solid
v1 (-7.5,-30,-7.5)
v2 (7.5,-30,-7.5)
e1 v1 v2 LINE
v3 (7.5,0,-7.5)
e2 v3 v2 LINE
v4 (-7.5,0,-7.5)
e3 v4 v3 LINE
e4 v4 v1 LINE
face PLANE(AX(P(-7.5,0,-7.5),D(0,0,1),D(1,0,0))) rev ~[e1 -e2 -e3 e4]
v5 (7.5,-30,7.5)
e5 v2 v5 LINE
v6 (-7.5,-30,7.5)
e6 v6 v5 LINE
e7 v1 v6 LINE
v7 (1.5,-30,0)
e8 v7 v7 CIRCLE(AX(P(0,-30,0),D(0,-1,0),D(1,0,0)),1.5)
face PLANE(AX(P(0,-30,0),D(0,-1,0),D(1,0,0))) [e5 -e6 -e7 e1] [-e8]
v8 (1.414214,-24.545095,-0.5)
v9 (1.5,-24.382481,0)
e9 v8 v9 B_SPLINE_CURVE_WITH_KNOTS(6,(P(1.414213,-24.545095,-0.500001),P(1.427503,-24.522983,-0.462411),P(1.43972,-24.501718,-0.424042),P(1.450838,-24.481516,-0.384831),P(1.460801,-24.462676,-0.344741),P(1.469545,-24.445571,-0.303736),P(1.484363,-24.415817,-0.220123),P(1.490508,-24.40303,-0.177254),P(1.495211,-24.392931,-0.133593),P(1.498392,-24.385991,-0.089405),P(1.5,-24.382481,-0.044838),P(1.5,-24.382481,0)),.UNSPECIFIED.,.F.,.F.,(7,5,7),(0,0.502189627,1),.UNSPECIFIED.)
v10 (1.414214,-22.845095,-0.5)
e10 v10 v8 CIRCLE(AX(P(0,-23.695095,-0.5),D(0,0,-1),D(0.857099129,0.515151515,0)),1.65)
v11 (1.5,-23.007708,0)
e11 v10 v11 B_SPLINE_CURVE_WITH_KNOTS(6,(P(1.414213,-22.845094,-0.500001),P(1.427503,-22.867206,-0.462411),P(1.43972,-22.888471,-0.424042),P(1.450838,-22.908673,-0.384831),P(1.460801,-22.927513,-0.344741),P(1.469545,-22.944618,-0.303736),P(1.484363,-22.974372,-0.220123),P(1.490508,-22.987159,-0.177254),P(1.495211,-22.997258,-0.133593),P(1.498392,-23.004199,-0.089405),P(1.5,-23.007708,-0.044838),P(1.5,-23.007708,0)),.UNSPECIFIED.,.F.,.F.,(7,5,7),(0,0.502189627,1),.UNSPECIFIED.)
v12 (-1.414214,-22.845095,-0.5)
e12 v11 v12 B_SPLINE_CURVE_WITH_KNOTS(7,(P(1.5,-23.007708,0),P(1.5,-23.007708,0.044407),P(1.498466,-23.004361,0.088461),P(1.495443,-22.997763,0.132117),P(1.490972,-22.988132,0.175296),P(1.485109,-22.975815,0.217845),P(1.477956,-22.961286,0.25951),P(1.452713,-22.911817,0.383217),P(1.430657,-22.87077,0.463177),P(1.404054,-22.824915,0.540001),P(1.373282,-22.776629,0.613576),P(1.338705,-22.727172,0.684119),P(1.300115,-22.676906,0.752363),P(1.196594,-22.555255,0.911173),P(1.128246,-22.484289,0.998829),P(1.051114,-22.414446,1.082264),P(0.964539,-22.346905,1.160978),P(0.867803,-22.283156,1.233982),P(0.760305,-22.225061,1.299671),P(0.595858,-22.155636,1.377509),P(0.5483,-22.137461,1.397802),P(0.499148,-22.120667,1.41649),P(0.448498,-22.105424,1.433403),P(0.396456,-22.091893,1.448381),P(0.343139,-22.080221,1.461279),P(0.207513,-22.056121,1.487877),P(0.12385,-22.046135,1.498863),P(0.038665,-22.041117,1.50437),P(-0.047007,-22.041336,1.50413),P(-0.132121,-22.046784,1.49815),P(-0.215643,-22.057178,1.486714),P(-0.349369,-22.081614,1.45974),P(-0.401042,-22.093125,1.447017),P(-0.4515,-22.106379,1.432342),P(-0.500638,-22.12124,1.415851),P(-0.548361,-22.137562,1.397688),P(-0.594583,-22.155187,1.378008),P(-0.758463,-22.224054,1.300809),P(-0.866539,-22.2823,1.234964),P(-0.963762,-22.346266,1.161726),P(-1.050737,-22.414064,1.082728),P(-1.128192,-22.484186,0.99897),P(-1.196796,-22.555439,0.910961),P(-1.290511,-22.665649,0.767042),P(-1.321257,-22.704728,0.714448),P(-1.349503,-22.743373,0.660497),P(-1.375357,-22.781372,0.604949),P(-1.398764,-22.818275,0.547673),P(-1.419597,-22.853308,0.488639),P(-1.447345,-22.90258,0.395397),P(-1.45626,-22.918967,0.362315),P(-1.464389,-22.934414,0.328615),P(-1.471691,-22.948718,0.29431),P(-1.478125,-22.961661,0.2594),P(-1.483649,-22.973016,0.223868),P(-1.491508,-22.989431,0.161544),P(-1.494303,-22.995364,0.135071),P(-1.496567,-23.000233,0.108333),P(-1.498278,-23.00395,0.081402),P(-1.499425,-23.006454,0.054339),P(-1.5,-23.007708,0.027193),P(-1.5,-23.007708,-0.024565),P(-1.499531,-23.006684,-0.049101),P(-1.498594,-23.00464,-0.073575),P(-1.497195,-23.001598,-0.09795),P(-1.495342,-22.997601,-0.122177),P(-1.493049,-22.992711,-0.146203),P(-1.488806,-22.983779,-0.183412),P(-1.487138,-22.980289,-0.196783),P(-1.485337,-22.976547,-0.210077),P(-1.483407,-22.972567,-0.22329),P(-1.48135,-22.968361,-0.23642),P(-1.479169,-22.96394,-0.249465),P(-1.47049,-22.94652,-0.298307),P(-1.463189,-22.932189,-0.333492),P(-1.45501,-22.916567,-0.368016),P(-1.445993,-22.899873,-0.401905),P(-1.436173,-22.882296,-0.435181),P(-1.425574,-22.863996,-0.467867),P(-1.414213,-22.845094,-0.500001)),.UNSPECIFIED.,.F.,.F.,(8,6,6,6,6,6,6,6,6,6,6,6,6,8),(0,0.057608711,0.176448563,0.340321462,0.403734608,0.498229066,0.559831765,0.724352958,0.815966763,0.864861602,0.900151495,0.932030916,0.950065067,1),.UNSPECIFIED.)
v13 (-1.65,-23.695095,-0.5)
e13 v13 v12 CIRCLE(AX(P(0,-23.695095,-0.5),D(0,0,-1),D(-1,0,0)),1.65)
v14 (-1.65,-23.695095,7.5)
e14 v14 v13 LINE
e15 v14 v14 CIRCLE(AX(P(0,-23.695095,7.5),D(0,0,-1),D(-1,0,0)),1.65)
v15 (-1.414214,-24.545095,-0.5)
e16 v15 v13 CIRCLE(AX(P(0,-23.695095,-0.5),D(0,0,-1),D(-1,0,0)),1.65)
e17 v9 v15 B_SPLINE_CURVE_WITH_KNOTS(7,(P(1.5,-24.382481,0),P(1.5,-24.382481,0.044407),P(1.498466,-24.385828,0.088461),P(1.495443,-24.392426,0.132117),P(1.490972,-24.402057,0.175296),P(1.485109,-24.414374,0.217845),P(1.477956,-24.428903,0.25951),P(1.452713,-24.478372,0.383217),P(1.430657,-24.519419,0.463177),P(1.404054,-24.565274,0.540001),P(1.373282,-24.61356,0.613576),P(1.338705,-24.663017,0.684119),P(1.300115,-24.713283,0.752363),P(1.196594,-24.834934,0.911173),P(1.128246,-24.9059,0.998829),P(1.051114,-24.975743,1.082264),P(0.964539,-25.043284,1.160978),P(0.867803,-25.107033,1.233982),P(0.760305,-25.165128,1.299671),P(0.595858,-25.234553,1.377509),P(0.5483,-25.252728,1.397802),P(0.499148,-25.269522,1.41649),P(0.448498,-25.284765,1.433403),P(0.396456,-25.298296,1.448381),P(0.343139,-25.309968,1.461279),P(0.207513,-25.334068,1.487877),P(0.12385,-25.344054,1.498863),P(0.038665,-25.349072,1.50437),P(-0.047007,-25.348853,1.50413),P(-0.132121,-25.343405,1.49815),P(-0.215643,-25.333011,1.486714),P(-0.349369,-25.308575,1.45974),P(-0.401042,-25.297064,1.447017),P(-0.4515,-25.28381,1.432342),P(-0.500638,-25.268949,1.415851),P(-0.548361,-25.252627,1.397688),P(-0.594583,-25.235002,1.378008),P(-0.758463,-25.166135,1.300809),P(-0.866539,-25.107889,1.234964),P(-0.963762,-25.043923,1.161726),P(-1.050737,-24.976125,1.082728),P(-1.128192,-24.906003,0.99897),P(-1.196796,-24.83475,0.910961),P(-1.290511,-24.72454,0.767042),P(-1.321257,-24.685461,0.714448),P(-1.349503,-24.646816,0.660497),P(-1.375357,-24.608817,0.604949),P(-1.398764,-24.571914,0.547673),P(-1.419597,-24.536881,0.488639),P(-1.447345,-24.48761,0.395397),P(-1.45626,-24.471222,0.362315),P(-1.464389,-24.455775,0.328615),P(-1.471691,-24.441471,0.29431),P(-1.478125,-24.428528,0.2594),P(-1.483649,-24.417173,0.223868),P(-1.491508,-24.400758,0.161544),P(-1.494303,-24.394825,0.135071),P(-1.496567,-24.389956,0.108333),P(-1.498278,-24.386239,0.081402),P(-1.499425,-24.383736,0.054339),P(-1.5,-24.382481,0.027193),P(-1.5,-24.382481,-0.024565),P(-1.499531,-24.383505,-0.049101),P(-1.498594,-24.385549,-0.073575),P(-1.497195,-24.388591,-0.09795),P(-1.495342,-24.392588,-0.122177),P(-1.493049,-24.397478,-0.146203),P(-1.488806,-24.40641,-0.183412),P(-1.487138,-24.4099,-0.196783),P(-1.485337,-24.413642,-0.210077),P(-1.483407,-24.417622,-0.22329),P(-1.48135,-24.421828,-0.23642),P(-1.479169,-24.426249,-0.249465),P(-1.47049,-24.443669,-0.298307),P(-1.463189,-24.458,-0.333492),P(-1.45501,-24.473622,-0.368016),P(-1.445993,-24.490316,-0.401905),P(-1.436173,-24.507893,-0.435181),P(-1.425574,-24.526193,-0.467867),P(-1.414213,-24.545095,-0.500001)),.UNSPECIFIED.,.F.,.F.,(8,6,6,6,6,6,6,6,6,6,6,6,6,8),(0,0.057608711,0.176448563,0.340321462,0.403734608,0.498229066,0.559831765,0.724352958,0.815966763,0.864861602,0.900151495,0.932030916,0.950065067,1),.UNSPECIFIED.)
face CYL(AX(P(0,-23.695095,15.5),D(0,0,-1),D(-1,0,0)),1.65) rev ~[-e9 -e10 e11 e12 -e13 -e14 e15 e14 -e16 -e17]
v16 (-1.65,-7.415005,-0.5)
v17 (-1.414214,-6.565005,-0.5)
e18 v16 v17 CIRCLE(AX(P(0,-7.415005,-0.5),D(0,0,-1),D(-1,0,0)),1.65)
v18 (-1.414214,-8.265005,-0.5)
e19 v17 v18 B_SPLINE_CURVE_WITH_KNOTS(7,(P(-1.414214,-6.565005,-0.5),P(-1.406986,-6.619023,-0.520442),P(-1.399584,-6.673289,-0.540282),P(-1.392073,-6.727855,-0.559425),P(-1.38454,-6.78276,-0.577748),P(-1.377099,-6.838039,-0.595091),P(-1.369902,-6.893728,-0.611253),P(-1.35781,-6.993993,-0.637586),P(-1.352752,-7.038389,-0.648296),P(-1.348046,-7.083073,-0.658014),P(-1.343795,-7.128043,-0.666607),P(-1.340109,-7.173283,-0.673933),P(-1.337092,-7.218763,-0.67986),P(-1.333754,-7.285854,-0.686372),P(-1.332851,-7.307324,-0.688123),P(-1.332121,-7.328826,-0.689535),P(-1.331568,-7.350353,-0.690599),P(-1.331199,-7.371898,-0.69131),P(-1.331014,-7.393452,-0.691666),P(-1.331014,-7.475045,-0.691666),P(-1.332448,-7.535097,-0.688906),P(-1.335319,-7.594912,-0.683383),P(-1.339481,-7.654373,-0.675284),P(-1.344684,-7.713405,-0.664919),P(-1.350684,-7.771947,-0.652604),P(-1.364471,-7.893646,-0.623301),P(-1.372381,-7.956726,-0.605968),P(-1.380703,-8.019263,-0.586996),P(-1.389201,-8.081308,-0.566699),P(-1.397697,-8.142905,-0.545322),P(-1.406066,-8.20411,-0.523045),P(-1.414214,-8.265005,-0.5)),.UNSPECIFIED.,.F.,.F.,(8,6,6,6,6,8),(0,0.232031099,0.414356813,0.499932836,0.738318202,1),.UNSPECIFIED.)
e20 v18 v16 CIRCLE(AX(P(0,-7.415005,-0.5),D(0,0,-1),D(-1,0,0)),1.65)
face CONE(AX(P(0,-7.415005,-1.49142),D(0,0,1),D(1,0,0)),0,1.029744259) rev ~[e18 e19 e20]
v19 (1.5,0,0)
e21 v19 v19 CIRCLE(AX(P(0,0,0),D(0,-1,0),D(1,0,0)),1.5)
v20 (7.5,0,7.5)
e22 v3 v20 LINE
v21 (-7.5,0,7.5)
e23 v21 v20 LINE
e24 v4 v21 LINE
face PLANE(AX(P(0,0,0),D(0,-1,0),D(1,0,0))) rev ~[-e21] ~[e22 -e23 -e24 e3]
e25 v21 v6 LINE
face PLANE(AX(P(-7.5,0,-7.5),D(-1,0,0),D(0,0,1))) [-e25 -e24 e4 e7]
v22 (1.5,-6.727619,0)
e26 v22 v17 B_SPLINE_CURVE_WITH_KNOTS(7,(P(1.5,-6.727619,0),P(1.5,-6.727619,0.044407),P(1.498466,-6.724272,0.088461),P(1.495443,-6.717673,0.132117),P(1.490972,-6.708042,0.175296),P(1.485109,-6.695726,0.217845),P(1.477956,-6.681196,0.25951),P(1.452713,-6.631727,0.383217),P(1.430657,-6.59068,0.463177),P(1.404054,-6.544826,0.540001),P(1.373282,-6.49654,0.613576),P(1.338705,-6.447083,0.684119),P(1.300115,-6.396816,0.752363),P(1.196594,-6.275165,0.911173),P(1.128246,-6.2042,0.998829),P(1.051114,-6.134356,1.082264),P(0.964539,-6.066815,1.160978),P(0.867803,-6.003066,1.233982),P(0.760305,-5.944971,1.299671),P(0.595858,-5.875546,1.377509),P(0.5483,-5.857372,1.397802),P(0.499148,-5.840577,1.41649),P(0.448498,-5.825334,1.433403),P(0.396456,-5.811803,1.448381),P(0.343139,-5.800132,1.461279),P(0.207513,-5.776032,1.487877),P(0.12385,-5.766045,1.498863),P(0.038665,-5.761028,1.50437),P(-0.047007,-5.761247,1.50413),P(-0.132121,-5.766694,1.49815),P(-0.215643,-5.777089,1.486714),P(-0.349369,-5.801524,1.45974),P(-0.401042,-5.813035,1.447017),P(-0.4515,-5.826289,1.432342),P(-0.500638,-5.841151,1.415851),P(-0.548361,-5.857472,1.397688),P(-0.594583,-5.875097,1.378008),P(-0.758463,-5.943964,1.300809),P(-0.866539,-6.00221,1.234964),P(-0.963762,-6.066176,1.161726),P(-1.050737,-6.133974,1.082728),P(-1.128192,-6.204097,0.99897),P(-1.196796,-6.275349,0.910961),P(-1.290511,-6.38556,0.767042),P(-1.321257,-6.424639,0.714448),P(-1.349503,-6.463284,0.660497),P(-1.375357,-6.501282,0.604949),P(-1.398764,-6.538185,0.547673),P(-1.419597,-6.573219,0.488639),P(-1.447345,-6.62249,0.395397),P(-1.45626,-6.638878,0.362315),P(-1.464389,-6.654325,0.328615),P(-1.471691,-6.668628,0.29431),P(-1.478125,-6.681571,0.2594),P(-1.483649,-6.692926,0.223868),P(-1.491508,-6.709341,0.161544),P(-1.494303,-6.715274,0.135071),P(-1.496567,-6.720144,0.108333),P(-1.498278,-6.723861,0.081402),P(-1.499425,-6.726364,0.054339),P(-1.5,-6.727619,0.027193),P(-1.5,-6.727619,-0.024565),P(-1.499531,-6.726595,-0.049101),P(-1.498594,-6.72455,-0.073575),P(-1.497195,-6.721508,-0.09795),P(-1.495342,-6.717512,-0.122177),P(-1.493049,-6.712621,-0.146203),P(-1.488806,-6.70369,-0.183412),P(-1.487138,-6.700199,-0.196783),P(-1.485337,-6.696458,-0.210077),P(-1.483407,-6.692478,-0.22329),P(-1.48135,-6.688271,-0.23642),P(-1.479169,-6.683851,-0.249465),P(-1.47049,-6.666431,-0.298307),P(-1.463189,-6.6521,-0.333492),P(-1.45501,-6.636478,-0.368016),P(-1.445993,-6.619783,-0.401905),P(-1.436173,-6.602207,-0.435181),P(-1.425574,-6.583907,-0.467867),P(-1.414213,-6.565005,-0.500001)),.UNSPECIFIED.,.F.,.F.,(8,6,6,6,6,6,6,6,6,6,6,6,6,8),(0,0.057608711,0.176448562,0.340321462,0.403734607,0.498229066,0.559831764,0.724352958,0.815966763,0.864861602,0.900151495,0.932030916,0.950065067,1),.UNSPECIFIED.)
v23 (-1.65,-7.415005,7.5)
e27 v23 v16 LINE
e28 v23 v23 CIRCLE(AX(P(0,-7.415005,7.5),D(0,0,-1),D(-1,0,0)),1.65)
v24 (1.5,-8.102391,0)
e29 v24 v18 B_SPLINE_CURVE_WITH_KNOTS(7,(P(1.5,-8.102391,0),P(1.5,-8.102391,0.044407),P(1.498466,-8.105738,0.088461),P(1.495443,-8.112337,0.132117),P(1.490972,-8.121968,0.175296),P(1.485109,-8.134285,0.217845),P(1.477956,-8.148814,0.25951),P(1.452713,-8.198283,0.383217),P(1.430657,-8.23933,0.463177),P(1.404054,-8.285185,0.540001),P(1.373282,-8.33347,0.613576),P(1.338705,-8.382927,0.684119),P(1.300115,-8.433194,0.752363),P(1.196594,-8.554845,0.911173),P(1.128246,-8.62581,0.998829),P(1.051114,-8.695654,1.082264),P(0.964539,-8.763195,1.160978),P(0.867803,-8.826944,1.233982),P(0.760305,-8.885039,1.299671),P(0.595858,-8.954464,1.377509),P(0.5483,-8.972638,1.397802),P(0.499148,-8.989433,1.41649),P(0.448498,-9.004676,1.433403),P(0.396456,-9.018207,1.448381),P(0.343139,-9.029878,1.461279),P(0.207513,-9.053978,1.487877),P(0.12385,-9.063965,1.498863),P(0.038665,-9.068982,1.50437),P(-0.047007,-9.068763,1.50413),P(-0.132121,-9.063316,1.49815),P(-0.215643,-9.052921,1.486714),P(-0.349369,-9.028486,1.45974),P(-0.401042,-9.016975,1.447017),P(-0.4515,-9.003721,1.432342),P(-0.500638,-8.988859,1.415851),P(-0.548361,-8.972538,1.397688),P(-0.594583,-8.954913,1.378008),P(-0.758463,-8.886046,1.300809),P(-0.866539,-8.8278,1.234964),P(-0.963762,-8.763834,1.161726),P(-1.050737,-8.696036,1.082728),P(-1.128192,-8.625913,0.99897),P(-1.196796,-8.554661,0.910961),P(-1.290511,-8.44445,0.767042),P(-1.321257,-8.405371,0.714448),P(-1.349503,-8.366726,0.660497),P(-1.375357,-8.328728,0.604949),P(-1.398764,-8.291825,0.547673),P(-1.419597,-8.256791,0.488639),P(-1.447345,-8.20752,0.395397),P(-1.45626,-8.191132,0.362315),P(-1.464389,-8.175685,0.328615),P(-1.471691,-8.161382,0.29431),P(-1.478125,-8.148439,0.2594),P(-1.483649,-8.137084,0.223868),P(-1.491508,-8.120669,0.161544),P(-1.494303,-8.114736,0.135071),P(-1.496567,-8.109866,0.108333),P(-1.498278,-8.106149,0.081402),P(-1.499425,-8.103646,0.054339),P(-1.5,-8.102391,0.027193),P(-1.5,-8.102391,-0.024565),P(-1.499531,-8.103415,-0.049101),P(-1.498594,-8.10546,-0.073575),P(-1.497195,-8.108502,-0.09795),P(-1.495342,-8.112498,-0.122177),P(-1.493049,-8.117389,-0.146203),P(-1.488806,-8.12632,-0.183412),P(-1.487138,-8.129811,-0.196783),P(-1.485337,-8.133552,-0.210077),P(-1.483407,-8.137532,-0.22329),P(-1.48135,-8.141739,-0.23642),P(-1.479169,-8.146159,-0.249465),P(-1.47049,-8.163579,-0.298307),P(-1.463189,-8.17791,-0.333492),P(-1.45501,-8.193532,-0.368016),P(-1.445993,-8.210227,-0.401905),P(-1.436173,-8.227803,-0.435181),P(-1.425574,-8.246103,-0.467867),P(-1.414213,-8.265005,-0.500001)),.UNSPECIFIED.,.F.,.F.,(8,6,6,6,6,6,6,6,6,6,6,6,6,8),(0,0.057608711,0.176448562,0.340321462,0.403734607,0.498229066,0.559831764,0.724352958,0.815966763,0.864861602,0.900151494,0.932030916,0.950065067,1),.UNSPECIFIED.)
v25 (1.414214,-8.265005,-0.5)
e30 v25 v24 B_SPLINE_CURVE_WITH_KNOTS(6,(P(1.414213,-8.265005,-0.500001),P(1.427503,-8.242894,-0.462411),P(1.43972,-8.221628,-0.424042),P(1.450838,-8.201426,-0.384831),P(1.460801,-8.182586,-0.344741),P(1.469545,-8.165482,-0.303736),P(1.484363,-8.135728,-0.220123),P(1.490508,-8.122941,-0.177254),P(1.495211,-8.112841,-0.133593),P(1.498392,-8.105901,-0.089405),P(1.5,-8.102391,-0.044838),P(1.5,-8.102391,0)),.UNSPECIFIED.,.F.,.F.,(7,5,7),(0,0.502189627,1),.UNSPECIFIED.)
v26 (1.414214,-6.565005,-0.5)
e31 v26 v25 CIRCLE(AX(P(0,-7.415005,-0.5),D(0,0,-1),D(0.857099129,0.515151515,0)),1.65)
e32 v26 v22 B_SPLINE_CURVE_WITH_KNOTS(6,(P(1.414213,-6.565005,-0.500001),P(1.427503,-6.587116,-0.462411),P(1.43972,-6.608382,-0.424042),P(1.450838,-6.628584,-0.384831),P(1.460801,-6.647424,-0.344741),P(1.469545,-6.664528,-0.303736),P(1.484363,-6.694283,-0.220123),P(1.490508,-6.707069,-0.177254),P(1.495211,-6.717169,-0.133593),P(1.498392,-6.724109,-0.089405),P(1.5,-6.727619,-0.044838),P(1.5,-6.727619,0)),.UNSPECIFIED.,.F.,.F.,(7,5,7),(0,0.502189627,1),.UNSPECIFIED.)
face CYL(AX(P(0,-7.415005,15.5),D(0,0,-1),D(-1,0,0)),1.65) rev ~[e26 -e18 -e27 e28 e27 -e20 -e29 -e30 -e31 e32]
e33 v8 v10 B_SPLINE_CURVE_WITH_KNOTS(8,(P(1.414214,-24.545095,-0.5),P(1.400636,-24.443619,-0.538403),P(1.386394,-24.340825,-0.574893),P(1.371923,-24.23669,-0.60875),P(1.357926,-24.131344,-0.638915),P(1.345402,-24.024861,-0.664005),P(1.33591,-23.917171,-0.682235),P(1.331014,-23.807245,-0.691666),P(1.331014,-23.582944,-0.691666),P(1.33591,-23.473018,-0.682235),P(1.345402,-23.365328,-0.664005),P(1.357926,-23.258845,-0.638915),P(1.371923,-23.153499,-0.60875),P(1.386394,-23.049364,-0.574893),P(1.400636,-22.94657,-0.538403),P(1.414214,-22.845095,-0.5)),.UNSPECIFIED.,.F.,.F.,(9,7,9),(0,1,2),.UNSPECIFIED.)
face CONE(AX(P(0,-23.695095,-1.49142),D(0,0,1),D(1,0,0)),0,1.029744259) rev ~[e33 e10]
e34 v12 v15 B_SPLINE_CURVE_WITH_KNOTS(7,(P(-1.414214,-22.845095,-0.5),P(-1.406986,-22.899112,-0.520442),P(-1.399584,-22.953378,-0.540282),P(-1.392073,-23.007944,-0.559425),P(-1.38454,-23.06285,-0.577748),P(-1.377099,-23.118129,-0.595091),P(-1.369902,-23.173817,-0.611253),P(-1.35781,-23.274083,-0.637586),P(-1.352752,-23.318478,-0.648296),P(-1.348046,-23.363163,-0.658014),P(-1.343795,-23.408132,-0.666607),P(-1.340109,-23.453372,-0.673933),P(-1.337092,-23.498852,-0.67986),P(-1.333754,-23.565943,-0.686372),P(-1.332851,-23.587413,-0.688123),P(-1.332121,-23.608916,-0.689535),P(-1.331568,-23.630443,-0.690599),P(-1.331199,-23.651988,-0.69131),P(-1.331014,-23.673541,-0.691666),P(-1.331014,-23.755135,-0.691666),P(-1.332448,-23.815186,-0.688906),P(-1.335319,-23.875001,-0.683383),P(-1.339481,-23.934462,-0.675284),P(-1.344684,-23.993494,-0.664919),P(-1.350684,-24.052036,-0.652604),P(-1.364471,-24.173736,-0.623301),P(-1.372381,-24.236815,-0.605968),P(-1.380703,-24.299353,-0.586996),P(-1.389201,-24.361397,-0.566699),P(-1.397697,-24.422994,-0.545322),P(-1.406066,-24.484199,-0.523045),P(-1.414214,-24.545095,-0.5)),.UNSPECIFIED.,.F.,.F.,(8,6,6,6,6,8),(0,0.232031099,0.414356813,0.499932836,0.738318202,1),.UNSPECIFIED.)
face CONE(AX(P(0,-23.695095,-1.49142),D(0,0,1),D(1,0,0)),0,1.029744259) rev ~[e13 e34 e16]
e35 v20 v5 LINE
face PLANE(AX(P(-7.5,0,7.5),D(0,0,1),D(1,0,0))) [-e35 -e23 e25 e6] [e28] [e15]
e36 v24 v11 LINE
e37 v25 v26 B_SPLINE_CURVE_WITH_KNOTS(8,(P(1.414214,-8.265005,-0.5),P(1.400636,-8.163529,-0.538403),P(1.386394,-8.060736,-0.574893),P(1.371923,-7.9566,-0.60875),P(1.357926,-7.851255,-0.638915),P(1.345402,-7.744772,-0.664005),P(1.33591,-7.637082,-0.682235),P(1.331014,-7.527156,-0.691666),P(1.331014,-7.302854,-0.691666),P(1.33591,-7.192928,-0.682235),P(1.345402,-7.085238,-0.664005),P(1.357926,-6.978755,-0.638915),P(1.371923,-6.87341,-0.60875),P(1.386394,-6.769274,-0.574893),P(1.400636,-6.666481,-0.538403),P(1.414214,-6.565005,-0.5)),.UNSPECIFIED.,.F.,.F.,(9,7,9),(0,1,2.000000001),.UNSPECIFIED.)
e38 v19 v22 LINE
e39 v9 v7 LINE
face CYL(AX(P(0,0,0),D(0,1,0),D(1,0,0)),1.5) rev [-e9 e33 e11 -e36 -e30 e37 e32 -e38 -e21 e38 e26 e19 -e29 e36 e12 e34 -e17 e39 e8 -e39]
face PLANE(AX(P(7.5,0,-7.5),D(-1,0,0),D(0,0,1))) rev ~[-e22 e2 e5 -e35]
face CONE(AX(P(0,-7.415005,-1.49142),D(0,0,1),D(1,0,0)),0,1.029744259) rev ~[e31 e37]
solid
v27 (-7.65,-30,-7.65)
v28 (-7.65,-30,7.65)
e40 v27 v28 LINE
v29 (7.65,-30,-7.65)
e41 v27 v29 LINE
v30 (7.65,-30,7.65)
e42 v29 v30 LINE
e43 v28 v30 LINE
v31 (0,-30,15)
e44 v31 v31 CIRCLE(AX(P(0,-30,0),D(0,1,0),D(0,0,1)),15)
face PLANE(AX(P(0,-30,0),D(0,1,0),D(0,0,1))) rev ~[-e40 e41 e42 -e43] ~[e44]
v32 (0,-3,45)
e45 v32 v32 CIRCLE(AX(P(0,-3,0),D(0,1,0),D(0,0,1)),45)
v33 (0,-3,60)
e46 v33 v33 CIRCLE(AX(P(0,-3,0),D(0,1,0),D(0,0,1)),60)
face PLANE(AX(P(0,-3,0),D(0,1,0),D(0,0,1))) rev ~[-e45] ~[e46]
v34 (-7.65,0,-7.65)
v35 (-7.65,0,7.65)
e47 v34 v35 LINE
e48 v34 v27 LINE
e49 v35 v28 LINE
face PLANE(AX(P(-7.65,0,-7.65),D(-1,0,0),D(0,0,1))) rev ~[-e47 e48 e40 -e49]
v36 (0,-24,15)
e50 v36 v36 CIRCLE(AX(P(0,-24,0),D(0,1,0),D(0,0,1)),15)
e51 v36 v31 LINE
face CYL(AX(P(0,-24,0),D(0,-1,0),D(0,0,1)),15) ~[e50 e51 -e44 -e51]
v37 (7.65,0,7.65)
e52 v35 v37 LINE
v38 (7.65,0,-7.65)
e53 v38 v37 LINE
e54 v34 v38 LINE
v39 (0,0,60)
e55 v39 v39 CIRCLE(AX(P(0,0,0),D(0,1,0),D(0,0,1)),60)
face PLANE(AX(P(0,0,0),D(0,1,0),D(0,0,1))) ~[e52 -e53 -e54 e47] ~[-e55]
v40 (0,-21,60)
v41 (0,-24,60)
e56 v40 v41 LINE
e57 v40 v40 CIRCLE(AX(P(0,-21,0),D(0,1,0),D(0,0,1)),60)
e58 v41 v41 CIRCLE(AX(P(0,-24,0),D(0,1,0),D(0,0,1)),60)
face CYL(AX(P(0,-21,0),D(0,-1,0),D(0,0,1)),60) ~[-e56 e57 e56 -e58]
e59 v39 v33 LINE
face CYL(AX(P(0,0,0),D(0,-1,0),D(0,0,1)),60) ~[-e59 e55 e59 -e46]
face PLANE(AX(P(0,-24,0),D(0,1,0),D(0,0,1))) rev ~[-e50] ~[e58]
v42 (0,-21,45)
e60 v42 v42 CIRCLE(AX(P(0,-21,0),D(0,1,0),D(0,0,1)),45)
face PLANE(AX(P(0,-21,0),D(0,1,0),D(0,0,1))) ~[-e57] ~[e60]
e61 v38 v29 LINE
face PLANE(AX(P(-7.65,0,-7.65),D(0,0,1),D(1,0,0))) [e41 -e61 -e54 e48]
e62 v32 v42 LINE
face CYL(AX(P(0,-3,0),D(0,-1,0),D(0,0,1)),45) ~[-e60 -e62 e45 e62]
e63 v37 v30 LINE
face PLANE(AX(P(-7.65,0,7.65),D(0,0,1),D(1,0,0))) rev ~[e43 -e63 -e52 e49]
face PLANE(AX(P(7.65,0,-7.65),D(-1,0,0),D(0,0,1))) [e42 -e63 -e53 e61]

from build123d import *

# Parameters (mm, degrees)
F0_W     = 15
F0_H     = 15
F0_R     = 1.5
F1_DEPTH = 30
F3_D     = 3.3
F3_DEPTH = 8
F3_TIP   = 0.9914200214
F6_W     = 15.3
F6_H     = 15.3
F7_DEPTH = 30.0010001


with BuildPart() as f1:
    # F0 (on Front) → F1 (new body)
    with BuildSketch(Plane.XZ):
        Rectangle(F0_W, F0_H)
        Circle(F0_R, mode=Mode.SUBTRACT)
    extrude(amount=F1_DEPTH)

    # F3
    with Locations(Plane.XY.offset(7.5)):
        with Locations((0, -7.4150050059), (0, -23.6950945109)):
            Hole(F3_D / 2, depth=F3_DEPTH)
            with Locations((0, 0, -(F3_DEPTH + F3_TIP / 2))):  # 118° drill point
                Cone(0, F3_D / 2, F3_TIP, mode=Mode.SUBTRACT)


with BuildPart() as f5:
    # F4 (on Right) → F5 (revolve)
    with BuildSketch(Plane.YZ):
        Polygon((-30, 0), (0, 0), (0, 60), (-3, 60), (-3, 45), (-21, 45), (-21, 60), (-24, 60), (-24, 15), (-30, 15), align=None)
    revolve(axis=Axis((0, -24.8045190237, 0), (0, 1, 0)))

    # F6 (on Front) → F7 (cut, through all)
    with BuildSketch(Plane.XZ):
        Rectangle(F6_W, F6_H)
    extrude(amount=F7_DEPTH, mode=Mode.SUBTRACT)


solid = Compound([f1.part, f5.part])
